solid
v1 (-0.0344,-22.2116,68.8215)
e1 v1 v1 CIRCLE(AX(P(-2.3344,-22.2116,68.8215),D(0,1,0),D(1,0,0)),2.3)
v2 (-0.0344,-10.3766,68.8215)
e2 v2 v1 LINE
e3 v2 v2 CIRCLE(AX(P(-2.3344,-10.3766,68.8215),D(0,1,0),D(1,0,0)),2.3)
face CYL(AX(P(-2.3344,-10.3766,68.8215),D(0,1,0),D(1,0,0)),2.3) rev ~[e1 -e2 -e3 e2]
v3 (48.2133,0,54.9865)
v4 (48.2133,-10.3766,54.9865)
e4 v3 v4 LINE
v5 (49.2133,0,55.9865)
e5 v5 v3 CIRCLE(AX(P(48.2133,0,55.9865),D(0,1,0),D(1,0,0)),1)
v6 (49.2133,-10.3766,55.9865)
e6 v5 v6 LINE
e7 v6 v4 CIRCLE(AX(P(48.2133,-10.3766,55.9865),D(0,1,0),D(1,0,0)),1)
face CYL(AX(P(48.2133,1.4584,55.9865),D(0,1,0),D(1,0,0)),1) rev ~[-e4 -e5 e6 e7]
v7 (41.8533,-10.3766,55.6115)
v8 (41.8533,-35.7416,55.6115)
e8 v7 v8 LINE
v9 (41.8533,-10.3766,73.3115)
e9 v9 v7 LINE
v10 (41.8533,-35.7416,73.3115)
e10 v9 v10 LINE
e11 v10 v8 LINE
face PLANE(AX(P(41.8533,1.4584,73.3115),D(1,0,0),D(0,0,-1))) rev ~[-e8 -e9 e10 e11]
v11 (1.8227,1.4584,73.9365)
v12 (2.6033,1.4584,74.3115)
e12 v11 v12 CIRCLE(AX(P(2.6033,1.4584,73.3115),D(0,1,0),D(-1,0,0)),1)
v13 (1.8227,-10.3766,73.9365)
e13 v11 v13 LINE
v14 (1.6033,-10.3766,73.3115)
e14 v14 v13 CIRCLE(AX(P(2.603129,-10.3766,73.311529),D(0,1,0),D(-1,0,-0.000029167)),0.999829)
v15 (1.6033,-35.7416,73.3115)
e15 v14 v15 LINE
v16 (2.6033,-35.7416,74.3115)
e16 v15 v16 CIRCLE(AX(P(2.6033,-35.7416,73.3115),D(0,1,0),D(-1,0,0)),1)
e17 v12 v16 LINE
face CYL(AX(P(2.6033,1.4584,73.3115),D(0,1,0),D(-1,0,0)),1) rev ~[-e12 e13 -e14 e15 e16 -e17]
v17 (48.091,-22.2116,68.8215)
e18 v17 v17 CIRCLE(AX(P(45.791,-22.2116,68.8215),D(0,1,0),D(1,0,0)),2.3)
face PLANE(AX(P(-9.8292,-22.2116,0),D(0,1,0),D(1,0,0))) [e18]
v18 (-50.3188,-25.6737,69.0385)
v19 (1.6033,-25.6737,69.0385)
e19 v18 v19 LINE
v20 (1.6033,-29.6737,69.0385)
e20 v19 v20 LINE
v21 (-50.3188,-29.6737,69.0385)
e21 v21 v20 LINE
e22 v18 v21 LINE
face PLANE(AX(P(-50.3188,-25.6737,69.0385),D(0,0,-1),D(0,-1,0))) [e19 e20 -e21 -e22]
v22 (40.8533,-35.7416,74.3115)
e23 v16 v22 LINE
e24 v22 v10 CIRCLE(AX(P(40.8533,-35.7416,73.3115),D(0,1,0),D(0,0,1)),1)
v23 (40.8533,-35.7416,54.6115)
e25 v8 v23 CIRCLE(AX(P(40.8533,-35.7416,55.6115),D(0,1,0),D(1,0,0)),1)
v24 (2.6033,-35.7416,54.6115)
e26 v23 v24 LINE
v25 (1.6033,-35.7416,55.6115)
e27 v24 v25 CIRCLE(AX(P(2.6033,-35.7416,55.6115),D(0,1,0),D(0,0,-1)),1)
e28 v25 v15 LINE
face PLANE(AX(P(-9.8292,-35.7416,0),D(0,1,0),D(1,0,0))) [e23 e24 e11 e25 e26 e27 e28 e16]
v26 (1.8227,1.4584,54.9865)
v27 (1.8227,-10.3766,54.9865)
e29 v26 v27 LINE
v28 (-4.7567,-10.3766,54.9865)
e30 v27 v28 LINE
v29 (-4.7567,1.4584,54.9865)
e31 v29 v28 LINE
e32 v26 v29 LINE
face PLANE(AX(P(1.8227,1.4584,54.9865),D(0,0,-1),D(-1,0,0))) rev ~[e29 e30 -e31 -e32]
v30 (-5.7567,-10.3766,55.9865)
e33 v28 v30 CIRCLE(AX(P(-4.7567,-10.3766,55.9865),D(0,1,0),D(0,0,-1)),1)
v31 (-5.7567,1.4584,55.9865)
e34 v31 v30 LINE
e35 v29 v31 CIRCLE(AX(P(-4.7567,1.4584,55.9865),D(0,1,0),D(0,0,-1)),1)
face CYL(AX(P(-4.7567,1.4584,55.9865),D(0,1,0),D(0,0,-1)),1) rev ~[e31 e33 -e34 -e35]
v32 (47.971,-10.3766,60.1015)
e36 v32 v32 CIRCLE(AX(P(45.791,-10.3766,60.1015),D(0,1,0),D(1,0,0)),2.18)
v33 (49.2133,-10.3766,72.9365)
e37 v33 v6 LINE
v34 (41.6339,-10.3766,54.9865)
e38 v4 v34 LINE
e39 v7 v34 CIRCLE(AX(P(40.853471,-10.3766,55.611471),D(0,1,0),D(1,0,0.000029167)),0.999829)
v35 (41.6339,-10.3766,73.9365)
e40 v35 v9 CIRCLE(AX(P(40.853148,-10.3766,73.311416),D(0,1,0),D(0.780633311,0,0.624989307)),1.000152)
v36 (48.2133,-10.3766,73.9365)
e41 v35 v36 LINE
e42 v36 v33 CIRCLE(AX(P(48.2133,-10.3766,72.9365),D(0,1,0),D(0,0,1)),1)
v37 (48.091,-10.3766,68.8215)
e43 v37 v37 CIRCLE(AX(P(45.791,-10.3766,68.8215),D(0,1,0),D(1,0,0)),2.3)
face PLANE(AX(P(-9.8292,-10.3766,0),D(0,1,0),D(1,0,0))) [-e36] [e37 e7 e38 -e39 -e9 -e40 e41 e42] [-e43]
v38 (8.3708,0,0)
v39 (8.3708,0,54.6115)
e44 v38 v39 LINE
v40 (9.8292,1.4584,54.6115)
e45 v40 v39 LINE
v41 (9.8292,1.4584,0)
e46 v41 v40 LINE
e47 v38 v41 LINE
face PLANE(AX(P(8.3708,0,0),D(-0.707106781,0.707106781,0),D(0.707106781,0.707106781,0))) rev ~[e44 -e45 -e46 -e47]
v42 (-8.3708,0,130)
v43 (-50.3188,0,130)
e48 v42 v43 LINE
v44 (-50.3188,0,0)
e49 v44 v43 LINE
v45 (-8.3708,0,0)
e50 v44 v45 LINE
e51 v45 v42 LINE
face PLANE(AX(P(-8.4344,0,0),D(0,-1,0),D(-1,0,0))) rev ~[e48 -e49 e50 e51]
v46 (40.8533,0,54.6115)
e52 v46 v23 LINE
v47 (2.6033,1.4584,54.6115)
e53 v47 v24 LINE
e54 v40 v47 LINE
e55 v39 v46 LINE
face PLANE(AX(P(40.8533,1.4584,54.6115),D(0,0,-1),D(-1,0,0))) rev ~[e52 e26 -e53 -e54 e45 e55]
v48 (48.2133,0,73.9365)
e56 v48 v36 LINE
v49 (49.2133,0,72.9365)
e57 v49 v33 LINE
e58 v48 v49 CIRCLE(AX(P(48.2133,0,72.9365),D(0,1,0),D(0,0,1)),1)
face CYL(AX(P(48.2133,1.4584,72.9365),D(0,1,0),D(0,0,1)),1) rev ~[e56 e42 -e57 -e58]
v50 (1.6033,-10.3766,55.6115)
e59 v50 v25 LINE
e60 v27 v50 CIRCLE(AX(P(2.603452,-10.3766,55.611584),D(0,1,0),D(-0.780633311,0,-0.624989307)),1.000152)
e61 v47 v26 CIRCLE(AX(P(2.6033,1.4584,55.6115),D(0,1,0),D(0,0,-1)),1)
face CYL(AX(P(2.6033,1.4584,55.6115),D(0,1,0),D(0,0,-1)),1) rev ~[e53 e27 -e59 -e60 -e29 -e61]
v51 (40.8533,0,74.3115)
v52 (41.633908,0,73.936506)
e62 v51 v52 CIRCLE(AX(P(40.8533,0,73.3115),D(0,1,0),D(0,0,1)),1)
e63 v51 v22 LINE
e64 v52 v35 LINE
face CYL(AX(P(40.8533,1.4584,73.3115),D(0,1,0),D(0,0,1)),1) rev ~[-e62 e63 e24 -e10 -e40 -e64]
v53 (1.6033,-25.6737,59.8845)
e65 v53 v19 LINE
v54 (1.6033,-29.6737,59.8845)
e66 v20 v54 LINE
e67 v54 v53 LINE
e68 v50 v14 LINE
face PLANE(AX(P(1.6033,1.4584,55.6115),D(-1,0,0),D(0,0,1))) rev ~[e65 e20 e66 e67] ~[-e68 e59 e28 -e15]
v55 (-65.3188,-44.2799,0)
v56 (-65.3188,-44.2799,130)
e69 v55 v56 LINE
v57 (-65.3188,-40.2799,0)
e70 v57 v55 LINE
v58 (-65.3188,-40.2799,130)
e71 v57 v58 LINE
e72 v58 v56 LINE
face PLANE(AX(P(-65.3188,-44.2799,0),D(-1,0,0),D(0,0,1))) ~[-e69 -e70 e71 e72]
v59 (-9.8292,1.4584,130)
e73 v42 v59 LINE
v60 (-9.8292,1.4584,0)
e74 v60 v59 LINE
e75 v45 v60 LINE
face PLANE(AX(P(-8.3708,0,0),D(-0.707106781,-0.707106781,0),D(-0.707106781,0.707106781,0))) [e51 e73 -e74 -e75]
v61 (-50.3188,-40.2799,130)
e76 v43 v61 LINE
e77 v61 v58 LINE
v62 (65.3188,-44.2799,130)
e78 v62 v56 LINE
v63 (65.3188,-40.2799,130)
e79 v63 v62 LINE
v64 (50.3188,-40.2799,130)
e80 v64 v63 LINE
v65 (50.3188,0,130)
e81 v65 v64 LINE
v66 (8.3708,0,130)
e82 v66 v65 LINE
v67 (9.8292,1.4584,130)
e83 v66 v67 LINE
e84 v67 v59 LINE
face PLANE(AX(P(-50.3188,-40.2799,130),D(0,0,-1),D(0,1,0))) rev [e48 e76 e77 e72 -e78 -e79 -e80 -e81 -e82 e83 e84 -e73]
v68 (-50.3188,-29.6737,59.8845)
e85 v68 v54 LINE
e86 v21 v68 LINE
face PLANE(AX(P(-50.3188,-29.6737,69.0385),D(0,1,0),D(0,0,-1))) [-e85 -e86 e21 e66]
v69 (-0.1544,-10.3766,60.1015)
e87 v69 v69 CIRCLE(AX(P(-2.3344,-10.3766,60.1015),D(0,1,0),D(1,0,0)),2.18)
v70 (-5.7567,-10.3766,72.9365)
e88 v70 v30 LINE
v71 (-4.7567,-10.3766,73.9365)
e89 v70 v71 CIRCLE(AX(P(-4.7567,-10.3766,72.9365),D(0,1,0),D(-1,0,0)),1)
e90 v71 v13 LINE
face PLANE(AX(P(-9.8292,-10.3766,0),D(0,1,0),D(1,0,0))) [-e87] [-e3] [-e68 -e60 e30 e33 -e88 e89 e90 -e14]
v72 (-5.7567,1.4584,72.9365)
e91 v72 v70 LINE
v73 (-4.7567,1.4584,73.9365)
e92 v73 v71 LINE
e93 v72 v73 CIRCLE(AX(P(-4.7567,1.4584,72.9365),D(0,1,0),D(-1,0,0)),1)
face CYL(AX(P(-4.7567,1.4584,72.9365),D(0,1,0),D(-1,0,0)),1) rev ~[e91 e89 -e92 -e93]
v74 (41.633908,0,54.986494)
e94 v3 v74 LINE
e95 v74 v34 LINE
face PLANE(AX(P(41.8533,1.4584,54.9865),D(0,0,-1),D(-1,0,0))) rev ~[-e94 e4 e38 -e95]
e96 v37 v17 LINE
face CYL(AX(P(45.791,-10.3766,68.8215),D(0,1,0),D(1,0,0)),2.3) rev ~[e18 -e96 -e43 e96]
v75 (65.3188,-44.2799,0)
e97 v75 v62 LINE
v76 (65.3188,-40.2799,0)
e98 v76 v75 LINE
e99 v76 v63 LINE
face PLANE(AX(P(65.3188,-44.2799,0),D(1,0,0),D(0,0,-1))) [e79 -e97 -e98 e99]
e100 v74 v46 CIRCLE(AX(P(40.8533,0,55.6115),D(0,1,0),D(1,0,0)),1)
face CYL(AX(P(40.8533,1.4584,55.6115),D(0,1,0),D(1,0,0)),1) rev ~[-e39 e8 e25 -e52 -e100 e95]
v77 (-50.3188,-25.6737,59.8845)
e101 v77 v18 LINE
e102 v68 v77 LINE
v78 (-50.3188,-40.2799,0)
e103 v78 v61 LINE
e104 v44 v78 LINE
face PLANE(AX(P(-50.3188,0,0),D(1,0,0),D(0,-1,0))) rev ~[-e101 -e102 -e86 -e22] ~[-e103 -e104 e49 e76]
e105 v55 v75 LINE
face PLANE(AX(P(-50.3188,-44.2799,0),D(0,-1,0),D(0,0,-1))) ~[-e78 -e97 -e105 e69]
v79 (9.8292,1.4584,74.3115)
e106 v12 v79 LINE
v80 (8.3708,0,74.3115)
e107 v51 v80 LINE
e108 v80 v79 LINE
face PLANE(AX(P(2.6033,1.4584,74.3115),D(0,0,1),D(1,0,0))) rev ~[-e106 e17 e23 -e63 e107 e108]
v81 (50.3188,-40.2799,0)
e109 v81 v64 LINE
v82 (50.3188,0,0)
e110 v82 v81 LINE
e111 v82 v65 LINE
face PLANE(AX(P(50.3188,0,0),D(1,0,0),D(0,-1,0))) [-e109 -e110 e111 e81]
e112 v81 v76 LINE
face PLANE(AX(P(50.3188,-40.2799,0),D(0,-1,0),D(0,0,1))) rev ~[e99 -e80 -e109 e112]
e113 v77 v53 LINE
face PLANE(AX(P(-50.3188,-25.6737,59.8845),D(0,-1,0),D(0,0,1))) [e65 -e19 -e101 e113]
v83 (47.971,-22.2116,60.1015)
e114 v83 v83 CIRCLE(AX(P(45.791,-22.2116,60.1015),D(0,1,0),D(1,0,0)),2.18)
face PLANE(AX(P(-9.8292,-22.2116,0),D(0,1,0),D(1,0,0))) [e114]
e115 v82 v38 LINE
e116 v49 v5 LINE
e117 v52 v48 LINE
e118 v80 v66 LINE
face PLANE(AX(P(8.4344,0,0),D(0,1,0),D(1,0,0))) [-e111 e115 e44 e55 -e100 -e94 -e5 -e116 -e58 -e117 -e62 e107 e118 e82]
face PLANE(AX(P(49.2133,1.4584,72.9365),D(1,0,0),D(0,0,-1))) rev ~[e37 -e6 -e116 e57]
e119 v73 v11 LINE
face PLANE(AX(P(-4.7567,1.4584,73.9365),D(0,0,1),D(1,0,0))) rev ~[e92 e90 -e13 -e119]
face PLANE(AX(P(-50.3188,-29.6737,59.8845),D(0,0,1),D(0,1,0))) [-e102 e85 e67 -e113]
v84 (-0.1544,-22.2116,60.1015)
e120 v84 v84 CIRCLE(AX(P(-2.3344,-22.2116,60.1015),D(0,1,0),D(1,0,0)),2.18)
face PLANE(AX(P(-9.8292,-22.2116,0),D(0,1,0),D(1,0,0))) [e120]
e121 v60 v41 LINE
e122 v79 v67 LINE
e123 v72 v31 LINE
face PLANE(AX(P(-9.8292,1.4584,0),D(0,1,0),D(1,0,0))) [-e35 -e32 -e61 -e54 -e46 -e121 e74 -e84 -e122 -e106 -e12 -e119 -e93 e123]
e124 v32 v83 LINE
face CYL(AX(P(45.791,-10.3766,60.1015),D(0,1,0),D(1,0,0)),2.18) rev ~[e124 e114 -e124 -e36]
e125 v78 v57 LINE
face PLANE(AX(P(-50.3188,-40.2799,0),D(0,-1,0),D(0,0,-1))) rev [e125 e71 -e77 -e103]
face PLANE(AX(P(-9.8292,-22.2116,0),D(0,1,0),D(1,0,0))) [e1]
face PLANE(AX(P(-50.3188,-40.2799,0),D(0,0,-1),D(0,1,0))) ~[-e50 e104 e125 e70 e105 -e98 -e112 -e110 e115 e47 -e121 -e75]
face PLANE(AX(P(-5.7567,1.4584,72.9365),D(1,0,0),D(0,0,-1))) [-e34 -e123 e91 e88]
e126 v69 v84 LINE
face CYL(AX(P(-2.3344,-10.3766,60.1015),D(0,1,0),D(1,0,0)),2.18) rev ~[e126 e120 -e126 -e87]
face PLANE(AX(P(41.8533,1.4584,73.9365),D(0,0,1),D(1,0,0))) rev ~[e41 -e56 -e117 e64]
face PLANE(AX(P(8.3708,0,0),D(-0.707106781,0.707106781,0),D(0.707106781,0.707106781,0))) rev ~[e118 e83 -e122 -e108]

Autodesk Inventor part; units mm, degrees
ref_plane "XZ Plane" through (0, 0, 0) normal (0, 1, 0) x (-1, 0, 0)
ref_plane "XY Plane" through (0, 0, 0) normal (0, 0, 1) x (1, 0, 0)
sketch "Sketch1" plane through (0, 0, 0) normal (0, 0, 1) x (1, 0, 0)
  line L0 (-9.963, 1.5182) -> (9.963, 1.5182) construction
  line L1 (9.963, 1.5182) -> (8.4447, 0) construction
  line L2 (18.795, 0) -> (8.4447, 0) construction
  line L3 (21.97, 0) -> (18.795, 0) construction
  line L4 (21.97, 0) -> (21.97, 26.825) construction
  line L5 (18.795, 30) -> (21.97, 26.825) construction
  line L6 (18.795, 30) -> (-18.795, 30) construction
  line L7 (-21.97, 26.825) -> (-18.795, 30) construction
  line L8 (-21.97, 26.825) -> (-21.97, 0) construction
  line L9 (-18.795, 0) -> (-21.97, 0) construction
  line L10 (-8.4447, 0) -> (-18.795, 0) construction
  line L11 (8.85, 30) -> (8.85, 2) construction
  line L12 (-9.85, 30) -> (-9.85, 2) construction
  line L13 (-8.4447, 0) -> (-9.963, 1.5182) construction
  point P0 (0, 0)
  point P1 (0, 0)
sketch "Sketch2" plane through (0, 0, 0) normal (0, 0, 1) x (1, 0, 0)
  line L0 (24.03, 0.5901) -> (24.03, 6.9401) construction
  line L1 (38.1011, 0.5901) -> (38.1011, 6.9401) construction
  line L2 (40.9704, -9.5093) -> (40.9704, -4.8619) construction
  line L3 (40.9704, -9.5093) -> (47.3304, -9.5093) construction
  line L4 (40.9704, -10.7393) -> (47.3304, -10.7393) construction
  line L5 (40.9704, -37.5619) -> (40.9704, -10.7393) construction
  line L6 (39.9704, -37.5619) -> (1.7204, -37.5619) construction
  line L7 (0.7204, -10.7393) -> (0.7204, -37.5619) construction
  line L8 (0.7204, -4.8619) -> (0.7204, -9.5093) construction
  line L9 (0.9398, -10.7393) -> (-5.6396, -10.7393) construction
  line L10 (39.9704, -3.8619) -> (1.7204, -3.8619) construction
  line L11 (10.9571, -1.3619) -> (31.1204, -1.3619) construction
  line L12 (8.4344, 0) -> (50.3188, 0)
  line L13 (50.3188, 0) -> (50.3188, -44.2799)
  line L14 (50.3188, -44.2799) -> (0, -44.2799)
  line L15 (8.4344, 0) -> (8.3708, 0)
  line L16 (8.3708, 0) -> (9.8292, 1.4584)
  line L17 (9.8292, 1.4584) -> (0, 1.4584)
  line L18 (-8.4344, 0) -> (-50.3188, 0)
  line L19 (-50.3188, 0) -> (-50.3188, -44.2799)
  line L20 (-50.3188, -44.2799) -> (0, -44.2799)
  line L21 (-8.3708, 0) -> (-9.8292, 1.4584)
  line L22 (-9.8292, 1.4584) -> (0, 1.4584)
  line L23 (-8.3708, 0) -> (-8.4344, 0)
  point P0 (0, 0)
  point P1 (37.3029, -27.4984)
  dimension "d0" = 41.8844
  dimension "d1" = 45
  dimension "d2" = 45
extrude "Extrusion1" add sketch "Sketch2" along normal blind 130
sketch "Sketch6" plane through (-9.8292, 1.4584, 0) normal (0, 1, 0) x (1, 0, 0)
  line L0 (1, -74.6503) -> (18.7, -74.6503) construction
  line L1 (19.7, -75.6503) -> (19.7, -113.9003) construction
  line L2 (0, -113.9003) -> (0, -75.6503) construction
  line L3 (-8.945, -124.6123) -> (-8.945, -5.3877) construction
  line L4 (-12.12, -5.3877) -> (-12.12, -124.6123) construction
  line L5 (28.645, -127.7873) -> (-8.945, -127.7873) construction
  line L6 (-12.12, -127.7873) -> (-8.945, -127.7873) construction
  line L7 (31.82, -124.6123) -> (31.82, -5.3877) construction
  line L8 (28.645, -2.2127) -> (-8.945, -2.2127) construction
  arc A0 (31.82, -5.3877) -> (28.645, -2.2127) centre (28.645, -5.3877) ccw construction
  arc A1 (-8.945, -2.2127) -> (-12.12, -5.3877) centre (-8.945, -5.3877) ccw construction
  arc A2 (28.645, -127.7873) -> (31.82, -124.6123) centre (28.645, -124.6123) ccw construction
  line L9 (0, -54.423) -> (0, -16.173) construction
  line L10 (50.6825, -54.6115) -> (12.4325, -54.6115)
  arc A3 (51.6825, -55.6115) -> (50.6825, -54.6115) centre (50.6825, -55.6115) ccw
  line L11 (51.6825, -73.3115) -> (51.6825, -55.6115)
  arc A4 (50.6825, -74.3115) -> (51.6825, -73.3115) centre (50.6825, -73.3115) ccw
  line L12 (12.4325, -74.3115) -> (50.6825, -74.3115)
  arc A5 (11.4325, -73.3115) -> (12.4325, -74.3115) centre (12.4325, -73.3115) ccw
  line L13 (11.4325, -55.6115) -> (11.4325, -73.3115)
  arc A6 (12.4325, -54.6115) -> (11.4325, -55.6115) centre (12.4325, -55.6115) ccw
  circle A7 centre (41.8325, -64.4615) radius 6.44 construction
  circle A8 centre (0, 0) radius 5.44 construction
  line L14 (51.6825, -54.9865) -> (58.0425, -54.9865) construction
  arc A9 (59.0425, -55.9865) -> (58.0425, -54.9865) centre (58.0425, -55.9865) ccw construction
  line L15 (59.0425, -72.9365) -> (59.0425, -55.9865) construction
  arc A10 (58.0425, -73.9365) -> (59.0425, -72.9365) centre (58.0425, -72.9365) ccw construction
  line L16 (51.6825, -73.9365) -> (58.0425, -73.9365) construction
  circle A11 centre (55.6202, -68.8215) radius 2.3 construction
  circle A12 centre (55.6202, -60.1015) radius 2.18 construction
  line L17 (11.6519, -54.9865) -> (5.0725, -54.9865) construction
  arc A13 (5.0725, -54.9865) -> (4.0725, -55.9865) centre (5.0725, -55.9865) ccw construction
  line L18 (4.0725, -72.9365) -> (4.0725, -55.9865) construction
  circle A14 centre (7.4948, -60.1015) radius 2.18 construction
  circle A15 centre (7.4948, -68.8215) radius 2.3 construction
  line L19 (5.0725, -73.9365) -> (11.6519, -73.9365) construction
  arc A16 (4.0725, -72.9365) -> (5.0725, -73.9365) centre (5.0725, -72.9365) ccw construction
  circle A17 centre (0, 0) radius 4.4768 construction
  line L20 (-5.3547, -0.1836) -> (-7.032, -1.2649) construction
  line L21 (-7.032, -1.2649) -> (-6.8876, -1.9) construction
  line L22 (-6.8876, -1.9) -> (-4.9076, -2.1498) construction
  line L23 (-7.0904, 0.8803) -> (-5.3567, -0.1081) construction
  line L24 (-6.9808, 1.5224) -> (-7.0904, 0.8803) construction
  line L25 (-5.0173, 1.8795) -> (-6.9808, 1.5224) construction
  line L26 (7.032, 1.2649) -> (6.8876, 1.9) construction
  line L27 (6.8876, 1.9) -> (4.9076, 2.1498) construction
  line L28 (5.3547, 0.1836) -> (7.032, 1.2649) construction
  line L29 (-7.032, -1.2649) -> (-6.8876, -1.9) construction
  line L30 (-6.9808, 1.5224) -> (-7.0904, 0.8803) construction
  line L31 (-5.3547, -0.1836) -> (-7.032, -1.2649) construction
  line L32 (-5.0173, 1.8795) -> (-6.9808, 1.5224) construction
  line L33 (60.148, 0) -> (-40.4896, 0) construction
  line L34 (9.85, -65) -> (23.9886, -65) construction
  point P0 (9.8292, 0)
  point P1 (-10.275, 0)
ref_plane "Work Plane1" through (8.3708, 0, 0) normal (0, 1, 0) x (1, 0, 0)
extrude "Extrusion2" cut sketch "Sketch6" against normal blind 37.2
sketch "Sketch7" plane through (8.3708, 0, 0) normal (0, 1, 0) x (1, 0, 0)
  point P0 (-8.3708, 0)
sketch "Sketch8" plane through (-9.8292, -35.7416, 0) normal (0, 1, 0) x (1, 0, 0)
  point P0 (9.8292, 0)
sketch "Sketch9" plane through (-9.8292, 1.4584, 0) normal (0, 1, 0) x (1, 0, 0)
  line L0 (1, -74.6503) -> (18.7, -74.6503) construction
  line L1 (19.7, -75.6503) -> (19.7, -113.9003) construction
  line L2 (0, -113.9003) -> (0, -75.6503) construction
  line L3 (-8.945, -124.6123) -> (-8.945, -5.3877) construction
  line L4 (-12.12, -5.3877) -> (-12.12, -124.6123) construction
  line L5 (28.645, -127.7873) -> (-8.945, -127.7873) construction
  line L6 (-12.12, -127.7873) -> (-8.945, -127.7873) construction
  line L7 (31.82, -124.6123) -> (31.82, -5.3877) construction
  line L8 (28.645, -2.2127) -> (-8.945, -2.2127) construction
  arc A0 (31.82, -5.3877) -> (28.645, -2.2127) centre (28.645, -5.3877) ccw construction
  arc A1 (-8.945, -2.2127) -> (-12.12, -5.3877) centre (-8.945, -5.3877) ccw construction
  arc A2 (28.645, -127.7873) -> (31.82, -124.6123) centre (28.645, -124.6123) ccw construction
  line L9 (0, -54.423) -> (0, -16.173) construction
  line L10 (50.6825, -54.6115) -> (12.4325, -54.6115) construction
  arc A3 (51.6825, -55.6115) -> (50.6825, -54.6115) centre (50.6825, -55.6115) ccw construction
  line L11 (51.6825, -73.3115) -> (51.6825, -55.6115)
  arc A4 (50.6825, -74.3115) -> (51.6825, -73.3115) centre (50.6825, -73.3115) ccw construction
  line L12 (12.4325, -74.3115) -> (50.6825, -74.3115) construction
  arc A5 (11.4325, -73.3115) -> (12.4325, -74.3115) centre (12.4325, -73.3115) ccw construction
  line L13 (11.4325, -55.6115) -> (11.4325, -73.3115)
  arc A6 (12.4325, -54.6115) -> (11.4325, -55.6115) centre (12.4325, -55.6115) ccw construction
  circle A7 centre (41.8325, -64.4615) radius 6.44 construction
  circle A8 centre (0, 0) radius 5.44 construction
  line L14 (51.6825, -54.9865) -> (58.0425, -54.9865)
  arc A9 (59.0425, -55.9865) -> (58.0425, -54.9865) centre (58.0425, -55.9865) ccw
  line L15 (59.0425, -72.9365) -> (59.0425, -55.9865)
  arc A10 (58.0425, -73.9365) -> (59.0425, -72.9365) centre (58.0425, -72.9365) ccw
  line L16 (51.6825, -73.9365) -> (58.0425, -73.9365)
  circle A11 centre (55.6202, -68.8215) radius 2.3 construction
  circle A12 centre (55.6202, -60.1015) radius 2.18 construction
  line L17 (11.6519, -54.9865) -> (5.0725, -54.9865)
  arc A13 (5.0725, -54.9865) -> (4.0725, -55.9865) centre (5.0725, -55.9865) ccw
  line L18 (4.0725, -72.9365) -> (4.0725, -55.9865)
  circle A14 centre (7.4948, -60.1015) radius 2.18 construction
  circle A15 centre (7.4948, -68.8215) radius 2.3 construction
  line L19 (5.0725, -73.9365) -> (11.6519, -73.9365)
  arc A16 (4.0725, -72.9365) -> (5.0725, -73.9365) centre (5.0725, -72.9365) ccw
  circle A17 centre (0, 0) radius 4.4768 construction
  line L20 (-5.3547, -0.1836) -> (-7.032, -1.2649) construction
  line L21 (-7.032, -1.2649) -> (-6.8876, -1.9) construction
  line L22 (-6.8876, -1.9) -> (-4.9076, -2.1498) construction
  line L23 (-7.0904, 0.8803) -> (-5.3567, -0.1081) construction
  line L24 (-6.9808, 1.5224) -> (-7.0904, 0.8803) construction
  line L25 (-5.0173, 1.8795) -> (-6.9808, 1.5224) construction
  line L26 (7.032, 1.2649) -> (6.8876, 1.9) construction
  line L27 (6.8876, 1.9) -> (4.9076, 2.1498) construction
  line L28 (5.3547, 0.1836) -> (7.032, 1.2649) construction
  line L29 (-7.032, -1.2649) -> (-6.8876, -1.9) construction
  line L30 (-6.9808, 1.5224) -> (-7.0904, 0.8803) construction
  line L31 (-5.3547, -0.1836) -> (-7.032, -1.2649) construction
  line L32 (-5.0173, 1.8795) -> (-6.9808, 1.5224) construction
  line L33 (60.148, 0) -> (-40.4896, 0) construction
  line L34 (9.85, -65) -> (23.9886, -65) construction
  line L35 (51.6825, -73.9365) -> (51.4631, -73.9365)
  arc A18 (50.6825, -74.3115) -> (51.6825, -73.3115) centre (50.6825, -73.3115) ccw construction
  line L36 (51.6825, -54.9865) -> (51.4631, -54.9865)
  line L37 (51.6825, -55.6115) -> (51.6825, -73.3115) projected
  arc A19 (51.6825, -55.6115) -> (51.4631, -54.9865) centre (50.6825, -55.6115) ccw
  arc A20 (51.4631, -73.9365) -> (51.6825, -73.3115) centre (50.6825, -73.3115) ccw
  arc A21 (11.4325, -73.3115) -> (11.6519, -73.9365) centre (12.4325, -73.3115) ccw
  arc A22 (11.6519, -54.9865) -> (11.4325, -55.6115) centre (12.4325, -55.6115) ccw
  point P0 (9.8292, 0)
  point P1 (9.8292, 0)
  point P2 (-10.275, 0)
sketch "Sketch10" plane through (0, 0, 130) normal (0, 0, 1) x (1, 0, 0)
  line L0 (-70.4463, 0) -> (70.4463, 0) projected
  line L1 (9.8292, 1.4584) -> (-9.8292, 1.4584) projected
  point P0 (0, 0)
  dimension "d8" = 1.4584
extrude "Extrusion3" cut sketch "Sketch9" against normal blind 11.835
sketch "Sketch11" plane through (0, 0, 130) normal (0, 0, 1) x (1, 0, 0)
  line L0 (-4.7567, 1.4584) -> (-4.7567, -10.3766) projected
  line L1 (41.6339, 0) -> (41.6339, -10.3766) projected
  point P0 (0, 0)
sketch "Sketch12" plane through (-9.8292, -10.3766, 0) normal (0, 1, 0) x (1, 0, 0)
  point P0 (9.8292, 0)
sketch "Sketch13" plane through (-9.8292, -10.3766, 0) normal (0, 1, 0) x (1, 0, 0)
  point P0 (9.8292, 0)
sketch "Sketch14" plane through (-9.8292, -10.3766, 0) normal (0, 1, 0) x (1, 0, 0)
  line L0 (1, -74.6503) -> (18.7, -74.6503) construction
  line L1 (19.7, -75.6503) -> (19.7, -113.9003) construction
  line L2 (0, -113.9003) -> (0, -75.6503) construction
  line L3 (-8.945, -124.6123) -> (-8.945, -5.3877) construction
  line L4 (-12.12, -5.3877) -> (-12.12, -124.6123) construction
  line L5 (28.645, -127.7873) -> (-8.945, -127.7873) construction
  line L6 (-12.12, -127.7873) -> (-8.945, -127.7873) construction
  line L7 (31.82, -124.6123) -> (31.82, -5.3877) construction
  line L8 (28.645, -2.2127) -> (-8.945, -2.2127) construction
  arc A0 (31.82, -5.3877) -> (28.645, -2.2127) centre (28.645, -5.3877) ccw construction
  arc A1 (-8.945, -2.2127) -> (-12.12, -5.3877) centre (-8.945, -5.3877) ccw construction
  arc A2 (28.645, -127.7873) -> (31.82, -124.6123) centre (28.645, -124.6123) ccw construction
  line L9 (0, -54.423) -> (0, -16.173) construction
  line L10 (50.6825, -54.6115) -> (12.4325, -54.6115) construction
  arc A3 (51.6825, -55.6115) -> (50.6825, -54.6115) centre (50.6825, -55.6115) ccw construction
  line L11 (51.6825, -73.3115) -> (51.6825, -55.6115) construction
  arc A4 (50.6825, -74.3115) -> (51.6825, -73.3115) centre (50.6825, -73.3115) ccw construction
  line L12 (12.4325, -74.3115) -> (50.6825, -74.3115) construction
  arc A5 (11.4325, -73.3115) -> (12.4325, -74.3115) centre (12.4325, -73.3115) ccw construction
  line L13 (11.4325, -55.6115) -> (11.4325, -73.3115) construction
  arc A6 (12.4325, -54.6115) -> (11.4325, -55.6115) centre (12.4325, -55.6115) ccw construction
  circle A7 centre (41.8325, -64.4615) radius 6.44 construction
  circle A8 centre (0, 0) radius 5.44 construction
  line L14 (51.6825, -54.9865) -> (58.0425, -54.9865) construction
  arc A9 (59.0425, -55.9865) -> (58.0425, -54.9865) centre (58.0425, -55.9865) ccw construction
  line L15 (59.0425, -72.9365) -> (59.0425, -55.9865) construction
  arc A10 (58.0425, -73.9365) -> (59.0425, -72.9365) centre (58.0425, -72.9365) ccw construction
  line L16 (51.6825, -73.9365) -> (58.0425, -73.9365) construction
  circle A11 centre (55.6202, -68.8215) radius 2.3
  circle A12 centre (55.6202, -60.1015) radius 2.18
  line L17 (11.6519, -54.9865) -> (5.0725, -54.9865) construction
  arc A13 (5.0725, -54.9865) -> (4.0725, -55.9865) centre (5.0725, -55.9865) ccw construction
  line L18 (4.0725, -72.9365) -> (4.0725, -55.9865) construction
  circle A14 centre (7.4948, -60.1015) radius 2.18
  circle A15 centre (7.4948, -68.8215) radius 2.3
  line L19 (5.0725, -73.9365) -> (11.6519, -73.9365) construction
  arc A16 (4.0725, -72.9365) -> (5.0725, -73.9365) centre (5.0725, -72.9365) ccw construction
  circle A17 centre (0, 0) radius 4.4768 construction
  line L20 (-5.3547, -0.1836) -> (-7.032, -1.2649) construction
  line L21 (-7.032, -1.2649) -> (-6.8876, -1.9) construction
  line L22 (-6.8876, -1.9) -> (-4.9076, -2.1498) construction
  line L23 (-7.0904, 0.8803) -> (-5.3567, -0.1081) construction
  line L24 (-6.9808, 1.5224) -> (-7.0904, 0.8803) construction
  line L25 (-5.0173, 1.8795) -> (-6.9808, 1.5224) construction
  line L26 (7.032, 1.2649) -> (6.8876, 1.9) construction
  line L27 (6.8876, 1.9) -> (4.9076, 2.1498) construction
  line L28 (5.3547, 0.1836) -> (7.032, 1.2649) construction
  line L29 (-7.032, -1.2649) -> (-6.8876, -1.9) construction
  line L30 (-6.9808, 1.5224) -> (-7.0904, 0.8803) construction
  line L31 (-5.3547, -0.1836) -> (-7.032, -1.2649) construction
  line L32 (-5.0173, 1.8795) -> (-6.9808, 1.5224) construction
  line L33 (60.148, 0) -> (-40.4896, 0) construction
  line L34 (9.85, -65) -> (23.9886, -65) construction
  line L35 (51.6825, -73.9365) -> (51.4631, -73.9365) construction
  arc A18 (50.6825, -74.3115) -> (51.6825, -73.3115) centre (50.6825, -73.3115) ccw construction
  line L36 (51.6825, -54.9865) -> (51.4631, -54.9865) construction
  line L37 (51.6825, -55.6115) -> (51.6825, -73.3115) construction
  arc A19 (51.6825, -55.6115) -> (51.4631, -54.9865) centre (50.6825, -55.6115) ccw construction
  arc A20 (51.4631, -73.9365) -> (51.6825, -73.3115) centre (50.6825, -73.3115) ccw construction
  arc A21 (11.4325, -73.3115) -> (11.6519, -73.9365) centre (12.4325, -73.3115) ccw construction
  arc A22 (11.6519, -54.9865) -> (11.4325, -55.6115) centre (12.4325, -55.6115) ccw construction
  point P0 (9.8292, 0)
  point P1 (9.8292, 0)
  point P2 (9.8292, 0)
  point P3 (-10.275, 0)
extrude "Extrusion4" cut sketch "Sketch14" against normal blind 11.835
sketch "Sketch15" plane through (50.3188, -44.2799, 0) normal (1, 0, 0) x (0, 0, -1)
  line L0 (0, 0) -> (-130, 0) projected
  line L1 (0, 44.2799) -> (0, 0) projected
  line L2 (-130, 0) -> (0, 0)
  line L3 (0, 0) -> (0, 4)
  line L4 (0, 4) -> (-130, 4)
  line L5 (-130, 4) -> (-130, 0)
  dimension "d13" = 4
extrude "Extrusion5" add sketch "Sketch15" along normal blind 15
mirror "Mirror1" about plane through (0, 0, 0) normal (1, 0, 0) of "Extrusion5"
sketch "Sketch16" plane through (-50.3188, 0, 0) normal (-1, 0, 0) x (0, 0, 1)
  line L0 (55.6115, -10.3766) -> (55.6115, -35.7416) construction
  line L1 (73.3115, -10.3766) -> (73.3115, -35.7416) construction
  line L2 (55.6115, -35.7416) -> (73.3115, -35.7416) construction
  line L3 (55.6115, -25.7416) -> (73.3115, -25.7416) construction
  line L4 (59.8845, -25.6737) -> (69.0385, -25.6737)
  line L5 (69.0385, -25.6737) -> (69.0385, -29.6737)
  line L6 (69.0385, -29.6737) -> (59.8845, -29.6737)
  line L7 (59.8845, -29.6737) -> (59.8845, -25.6737)
  line L8 (59.8845, -25.6737) -> (69.0385, -29.6737) construction
  line L9 (69.0385, -25.6737) -> (59.8845, -29.6737) construction
  point P0 (0, 0)
  point P1 (64.4615, -25.7416)
  point P2 (64.4615, -27.6737)
  dimension "d16" = 10
  dimension "d17" = 4
extrude "Extrusion6" cut sketch "Sketch16" against normal blind 59.45
properties part number "plateau_coulisseant"
